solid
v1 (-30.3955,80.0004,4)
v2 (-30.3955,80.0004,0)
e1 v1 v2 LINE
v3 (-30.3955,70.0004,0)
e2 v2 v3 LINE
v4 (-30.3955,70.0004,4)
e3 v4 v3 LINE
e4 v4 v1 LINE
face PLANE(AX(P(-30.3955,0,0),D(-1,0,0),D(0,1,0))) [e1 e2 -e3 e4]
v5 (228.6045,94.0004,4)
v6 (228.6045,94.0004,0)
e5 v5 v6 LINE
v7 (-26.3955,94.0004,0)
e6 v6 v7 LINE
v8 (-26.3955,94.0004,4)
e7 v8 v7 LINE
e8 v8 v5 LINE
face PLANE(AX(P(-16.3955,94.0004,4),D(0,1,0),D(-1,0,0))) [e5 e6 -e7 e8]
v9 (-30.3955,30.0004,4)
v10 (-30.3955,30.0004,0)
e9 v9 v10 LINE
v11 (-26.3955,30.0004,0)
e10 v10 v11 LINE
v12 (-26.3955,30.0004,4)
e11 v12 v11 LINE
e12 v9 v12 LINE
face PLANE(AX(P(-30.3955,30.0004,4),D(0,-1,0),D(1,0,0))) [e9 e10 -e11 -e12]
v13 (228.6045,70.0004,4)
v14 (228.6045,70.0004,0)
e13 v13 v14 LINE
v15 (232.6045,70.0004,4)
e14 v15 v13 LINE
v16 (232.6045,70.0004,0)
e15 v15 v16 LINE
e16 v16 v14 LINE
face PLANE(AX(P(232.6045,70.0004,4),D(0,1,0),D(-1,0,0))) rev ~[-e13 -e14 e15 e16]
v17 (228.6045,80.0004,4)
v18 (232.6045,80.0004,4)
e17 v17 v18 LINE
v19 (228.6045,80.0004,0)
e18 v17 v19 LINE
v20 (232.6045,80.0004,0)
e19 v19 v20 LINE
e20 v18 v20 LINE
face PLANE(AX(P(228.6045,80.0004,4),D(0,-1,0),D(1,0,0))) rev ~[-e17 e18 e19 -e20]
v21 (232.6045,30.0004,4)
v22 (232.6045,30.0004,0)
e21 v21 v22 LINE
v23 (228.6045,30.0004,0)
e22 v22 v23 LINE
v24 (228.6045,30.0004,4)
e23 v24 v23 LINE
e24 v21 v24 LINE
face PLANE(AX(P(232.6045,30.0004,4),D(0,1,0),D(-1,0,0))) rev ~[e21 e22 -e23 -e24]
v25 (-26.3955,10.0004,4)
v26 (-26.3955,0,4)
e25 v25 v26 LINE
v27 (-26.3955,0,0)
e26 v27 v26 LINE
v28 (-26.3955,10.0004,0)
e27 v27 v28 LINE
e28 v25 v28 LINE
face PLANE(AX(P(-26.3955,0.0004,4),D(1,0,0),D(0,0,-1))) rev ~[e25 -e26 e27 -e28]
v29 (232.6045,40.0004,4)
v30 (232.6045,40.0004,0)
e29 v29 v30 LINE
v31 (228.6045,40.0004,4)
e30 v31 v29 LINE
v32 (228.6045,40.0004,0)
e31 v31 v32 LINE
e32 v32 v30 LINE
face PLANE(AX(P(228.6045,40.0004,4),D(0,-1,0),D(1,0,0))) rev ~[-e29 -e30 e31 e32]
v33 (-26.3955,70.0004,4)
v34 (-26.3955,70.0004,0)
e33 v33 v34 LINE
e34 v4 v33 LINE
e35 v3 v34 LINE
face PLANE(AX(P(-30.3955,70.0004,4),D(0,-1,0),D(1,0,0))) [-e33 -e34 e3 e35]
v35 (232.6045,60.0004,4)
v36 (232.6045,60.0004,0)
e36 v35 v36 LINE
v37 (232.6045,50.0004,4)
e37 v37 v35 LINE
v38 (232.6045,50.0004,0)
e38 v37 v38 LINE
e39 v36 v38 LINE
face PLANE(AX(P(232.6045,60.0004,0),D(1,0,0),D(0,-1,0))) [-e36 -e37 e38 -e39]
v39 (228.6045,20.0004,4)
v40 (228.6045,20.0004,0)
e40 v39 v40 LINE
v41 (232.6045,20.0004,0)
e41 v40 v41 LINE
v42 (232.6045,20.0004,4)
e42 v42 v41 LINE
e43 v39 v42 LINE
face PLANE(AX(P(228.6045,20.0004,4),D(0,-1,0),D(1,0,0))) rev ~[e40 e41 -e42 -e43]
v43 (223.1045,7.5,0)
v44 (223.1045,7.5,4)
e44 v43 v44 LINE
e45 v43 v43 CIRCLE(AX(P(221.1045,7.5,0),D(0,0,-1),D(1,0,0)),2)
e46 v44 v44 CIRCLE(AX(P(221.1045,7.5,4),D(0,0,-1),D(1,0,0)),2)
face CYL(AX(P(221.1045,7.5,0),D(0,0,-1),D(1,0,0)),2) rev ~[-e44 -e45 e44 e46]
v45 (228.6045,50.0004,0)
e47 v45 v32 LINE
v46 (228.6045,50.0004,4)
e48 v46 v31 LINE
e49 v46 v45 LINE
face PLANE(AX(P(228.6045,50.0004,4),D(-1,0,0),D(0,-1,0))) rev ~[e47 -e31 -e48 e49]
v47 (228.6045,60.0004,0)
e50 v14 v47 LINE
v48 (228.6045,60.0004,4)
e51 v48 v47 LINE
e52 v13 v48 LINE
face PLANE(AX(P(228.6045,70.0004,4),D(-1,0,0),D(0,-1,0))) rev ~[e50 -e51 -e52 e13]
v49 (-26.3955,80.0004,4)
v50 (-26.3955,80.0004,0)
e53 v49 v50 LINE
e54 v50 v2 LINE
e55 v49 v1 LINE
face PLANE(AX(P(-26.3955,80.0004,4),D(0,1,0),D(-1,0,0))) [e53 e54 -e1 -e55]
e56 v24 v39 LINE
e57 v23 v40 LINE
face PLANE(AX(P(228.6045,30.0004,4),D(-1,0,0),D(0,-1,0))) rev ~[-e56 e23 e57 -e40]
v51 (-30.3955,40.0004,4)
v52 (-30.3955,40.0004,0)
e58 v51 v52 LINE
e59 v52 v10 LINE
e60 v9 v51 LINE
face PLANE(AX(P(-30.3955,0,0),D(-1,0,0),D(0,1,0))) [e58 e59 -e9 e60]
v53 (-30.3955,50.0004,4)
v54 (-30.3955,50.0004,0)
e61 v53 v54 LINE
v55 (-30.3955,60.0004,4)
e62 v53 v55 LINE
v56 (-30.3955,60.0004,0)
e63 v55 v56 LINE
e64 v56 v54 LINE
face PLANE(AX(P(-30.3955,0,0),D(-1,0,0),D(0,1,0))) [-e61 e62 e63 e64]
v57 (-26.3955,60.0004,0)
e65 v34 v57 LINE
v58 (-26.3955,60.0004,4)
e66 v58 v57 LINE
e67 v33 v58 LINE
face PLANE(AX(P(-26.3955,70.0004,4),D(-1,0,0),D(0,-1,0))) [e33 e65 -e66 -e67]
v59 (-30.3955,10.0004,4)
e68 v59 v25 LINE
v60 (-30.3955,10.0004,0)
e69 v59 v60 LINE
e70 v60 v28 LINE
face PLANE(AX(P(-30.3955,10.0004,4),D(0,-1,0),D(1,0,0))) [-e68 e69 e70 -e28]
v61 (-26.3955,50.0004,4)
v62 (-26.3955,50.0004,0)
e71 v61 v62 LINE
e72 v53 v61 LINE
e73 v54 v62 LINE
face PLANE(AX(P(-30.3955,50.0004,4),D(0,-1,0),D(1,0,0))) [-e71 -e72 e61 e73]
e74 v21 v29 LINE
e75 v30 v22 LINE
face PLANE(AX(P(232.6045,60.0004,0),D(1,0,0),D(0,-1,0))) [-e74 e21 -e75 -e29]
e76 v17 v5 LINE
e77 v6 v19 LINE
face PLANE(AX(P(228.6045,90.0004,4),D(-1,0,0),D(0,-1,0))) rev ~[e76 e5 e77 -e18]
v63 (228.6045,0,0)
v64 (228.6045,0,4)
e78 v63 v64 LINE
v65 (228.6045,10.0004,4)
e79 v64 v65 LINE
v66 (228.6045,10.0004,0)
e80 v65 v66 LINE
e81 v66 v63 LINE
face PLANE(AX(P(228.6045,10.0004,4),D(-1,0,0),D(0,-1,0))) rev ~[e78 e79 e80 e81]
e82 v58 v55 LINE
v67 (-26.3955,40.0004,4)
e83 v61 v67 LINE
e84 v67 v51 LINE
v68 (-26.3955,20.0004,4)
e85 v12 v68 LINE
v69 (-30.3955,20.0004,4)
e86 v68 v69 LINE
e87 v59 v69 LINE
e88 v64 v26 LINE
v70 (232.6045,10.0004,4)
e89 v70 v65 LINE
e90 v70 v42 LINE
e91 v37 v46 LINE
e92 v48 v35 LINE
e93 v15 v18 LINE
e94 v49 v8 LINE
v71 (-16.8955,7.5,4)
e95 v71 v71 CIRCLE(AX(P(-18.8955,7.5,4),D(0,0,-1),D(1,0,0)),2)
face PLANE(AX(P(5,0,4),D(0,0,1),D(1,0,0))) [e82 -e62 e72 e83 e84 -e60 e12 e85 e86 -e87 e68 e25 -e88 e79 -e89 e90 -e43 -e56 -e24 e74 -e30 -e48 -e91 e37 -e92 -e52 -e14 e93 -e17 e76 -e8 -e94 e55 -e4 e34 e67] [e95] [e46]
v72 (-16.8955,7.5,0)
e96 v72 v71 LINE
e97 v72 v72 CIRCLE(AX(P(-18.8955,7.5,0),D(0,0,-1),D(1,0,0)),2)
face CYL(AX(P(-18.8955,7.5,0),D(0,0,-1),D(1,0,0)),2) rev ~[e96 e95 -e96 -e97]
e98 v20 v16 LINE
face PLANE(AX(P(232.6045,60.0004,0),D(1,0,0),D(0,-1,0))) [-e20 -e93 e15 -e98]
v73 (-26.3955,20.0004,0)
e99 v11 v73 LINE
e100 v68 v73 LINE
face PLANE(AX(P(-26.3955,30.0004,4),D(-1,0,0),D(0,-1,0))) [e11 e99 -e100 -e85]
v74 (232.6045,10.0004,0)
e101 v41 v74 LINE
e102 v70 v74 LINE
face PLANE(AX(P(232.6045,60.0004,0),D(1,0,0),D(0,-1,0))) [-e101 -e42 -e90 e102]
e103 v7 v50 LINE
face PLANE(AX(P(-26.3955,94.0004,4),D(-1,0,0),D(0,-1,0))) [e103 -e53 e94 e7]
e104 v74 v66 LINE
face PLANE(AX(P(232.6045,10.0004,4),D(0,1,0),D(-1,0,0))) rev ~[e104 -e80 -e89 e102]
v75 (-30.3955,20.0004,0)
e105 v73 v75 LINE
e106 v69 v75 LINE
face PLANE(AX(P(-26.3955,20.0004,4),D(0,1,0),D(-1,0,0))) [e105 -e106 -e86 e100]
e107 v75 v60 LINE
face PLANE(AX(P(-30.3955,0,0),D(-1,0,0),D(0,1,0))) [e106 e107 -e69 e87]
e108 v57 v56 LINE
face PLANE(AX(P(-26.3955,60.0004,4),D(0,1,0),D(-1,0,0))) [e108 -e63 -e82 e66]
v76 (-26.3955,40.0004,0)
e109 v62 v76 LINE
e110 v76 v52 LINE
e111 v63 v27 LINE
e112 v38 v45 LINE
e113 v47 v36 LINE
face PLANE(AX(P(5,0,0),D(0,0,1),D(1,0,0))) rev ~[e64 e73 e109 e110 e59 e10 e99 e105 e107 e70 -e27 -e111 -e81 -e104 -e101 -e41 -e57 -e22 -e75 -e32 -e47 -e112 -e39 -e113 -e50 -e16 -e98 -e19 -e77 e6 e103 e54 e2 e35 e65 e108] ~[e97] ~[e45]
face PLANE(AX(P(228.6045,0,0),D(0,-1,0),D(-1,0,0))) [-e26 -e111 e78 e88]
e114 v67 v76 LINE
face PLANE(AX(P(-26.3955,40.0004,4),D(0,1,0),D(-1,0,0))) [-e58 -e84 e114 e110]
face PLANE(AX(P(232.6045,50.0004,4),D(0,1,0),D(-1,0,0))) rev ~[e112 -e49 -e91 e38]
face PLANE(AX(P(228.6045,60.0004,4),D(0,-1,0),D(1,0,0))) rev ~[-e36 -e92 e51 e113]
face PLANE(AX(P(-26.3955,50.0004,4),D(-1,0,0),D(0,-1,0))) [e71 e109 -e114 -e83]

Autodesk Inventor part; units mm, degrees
ref_plane "YZ Plane" through (0, 0, 0) normal (1, 0, 0) x (0, 1, 0)
ref_plane "XZ Plane" through (0, 0, 0) normal (0, 1, 0) x (-1, 0, 0)
ref_plane "XY Plane" through (0, 0, 0) normal (0, 0, 1) x (1, 0, 0)
sketch "Эскиз1" plane through (0, 0, 0) normal (0, 0, 1) x (1, 0, 0)
  line L0 (-26.3955, 0) -> (-26.3955, 30) projected
  line L1 (228.6045, 0) -> (228.6045, 30)
  circle A0 centre (221.1045, 7.5) radius 2
  circle A1 centre (-18.8955, 7.5) radius 2 projected
  line L2 (-26.3955, 60.0004) -> (-30.3955, 60.0004) projected
  line L3 (-26.3955, 60.0004) -> (228.6045, 60.0004)
  line L4 (228.6045, 60.0004) -> (228.6045, 0)
  line L5 (228.6045, 0) -> (-26.3955, 0)
  line L6 (-26.3955, 0) -> (-26.3955, 60.0004)
  point P0 (0, 0)
  dimension "d34" = 7.5
  dimension "d35" = 7.5
  dimension "d36" = 255
extrude "Выдавливание1" add sketch "Эскиз1" along normal blind 4
thicken "Толщина1" operation add thickness 4 both sides no extend neighbours yes toward (1, 0, 0) faces at (228.6045, 10, 1.3333)
thicken "Толщина2" operation add thickness 4 both sides no extend neighbours yes toward (-1, 0, 0) faces at (-26.3955, 40.0003, 2.6667)
sketch "Эскиз2" plane through (0, 0, 4) normal (0, 0, 1) x (1, 0, 0)
  line L0 (232.6045, 60.0004) -> (-30.3955, 60.0004) projected
  line L1 (-30.3955, 60.0004) -> (232.6045, 60.0004)
  line L2 (232.6045, 60.0004) -> (232.6045, 90.0004)
  line L3 (232.6045, 90.0004) -> (-30.3955, 90.0004)
  line L4 (-30.3955, 90.0004) -> (-30.3955, 60.0004)
  point P0 (0, 0)
  dimension "d6" = 30
  dimension "d37" = 263
extrude "Выдавливание2" add sketch "Эскиз2" against normal blind 4
sketch "Эскиз3" plane through (0, 0, 4) normal (0, 0, 1) x (1, 0, 0)
  line L0 (-30.3955, 90.0004) -> (-30.3955, 0) projected
  line L1 (-30.3955, 90.0004) -> (-26.3955, 90.0004)
  line L2 (-26.3955, 90.0004) -> (-26.3955, 80.0004)
  line L3 (-26.3955, 80.0004) -> (-30.3955, 80.0004)
  line L4 (-30.3955, 80.0004) -> (-30.3955, 90.0004)
  point P0 (0, 0)
  dimension "d9" = 4
  dimension "d10" = 10
extrude "Выдавливание3" cut sketch "Эскиз3" against normal blind 4
pattern_linear "Прямоуг.массив1" count 5 spacing 20 along (0, -1, 0) of "Выдавливание3"
thicken "Толщина3" operation add thickness 1 both sides no extend neighbours yes toward (1, 0, 0) faces at (-30.3955, 0.0003, 1.3333) (-29.0622, 0.0004, 2.6667)
sketch "Эскиз4" plane through (0, 0, 4) normal (0, 0, 1) x (1, 0, 0)
  line L0 (232.6045, 90.0004) -> (228.6045, 90.0004)
  line L1 (228.6045, 90.0004) -> (228.6045, 80.0004)
  line L2 (228.6045, 80.0004) -> (232.6045, 80.0004)
  line L3 (232.6045, 80.0004) -> (232.6045, 90.0004)
  point P0 (0, 0)
  dimension "d18" = 4
  dimension "d19" = 10
extrude "Выдавливание4" cut sketch "Эскиз4" against normal blind 4
pattern_linear "Прямоуг.массив2" count 5 spacing 20 along (0, -1, 0) of "Выдавливание4"
thicken "Толщина4" operation add thickness 1 both sides no extend neighbours yes toward (-1, 0, 0) faces at (232.6045, 0.0001, 1.3333) (229.9378, 0.0004, 2.6667)
sketch "Эскиз5" plane through (0, 0, 4) normal (0, 0, 1) x (1, 0, 0)
  line L0 (-26.3955, 90.0004) -> (228.6045, 90.0004) projected
  line L1 (-26.3955, 90.0004) -> (-21.3955, 90.0004)
  line L2 (-21.3955, 90.0004) -> (-21.3955, 94.0004)
  line L3 (-21.3955, 94.0004) -> (-26.3955, 94.0004)
  line L4 (-26.3955, 94.0004) -> (-26.3955, 90.0004)
  point P0 (0, 0)
  dimension "d27" = 5
  dimension "d28" = 4
extrude "Выдавливание5" add sketch "Эскиз5" against normal blind 4
pattern_linear "Прямоуг.массив3" count 51 spacing 5 along (1, 0, 0) of "Выдавливание5"
properties part number "KB33-046-004-014 - Лицевая вертикальня пластина" material "Пластик АБС"
